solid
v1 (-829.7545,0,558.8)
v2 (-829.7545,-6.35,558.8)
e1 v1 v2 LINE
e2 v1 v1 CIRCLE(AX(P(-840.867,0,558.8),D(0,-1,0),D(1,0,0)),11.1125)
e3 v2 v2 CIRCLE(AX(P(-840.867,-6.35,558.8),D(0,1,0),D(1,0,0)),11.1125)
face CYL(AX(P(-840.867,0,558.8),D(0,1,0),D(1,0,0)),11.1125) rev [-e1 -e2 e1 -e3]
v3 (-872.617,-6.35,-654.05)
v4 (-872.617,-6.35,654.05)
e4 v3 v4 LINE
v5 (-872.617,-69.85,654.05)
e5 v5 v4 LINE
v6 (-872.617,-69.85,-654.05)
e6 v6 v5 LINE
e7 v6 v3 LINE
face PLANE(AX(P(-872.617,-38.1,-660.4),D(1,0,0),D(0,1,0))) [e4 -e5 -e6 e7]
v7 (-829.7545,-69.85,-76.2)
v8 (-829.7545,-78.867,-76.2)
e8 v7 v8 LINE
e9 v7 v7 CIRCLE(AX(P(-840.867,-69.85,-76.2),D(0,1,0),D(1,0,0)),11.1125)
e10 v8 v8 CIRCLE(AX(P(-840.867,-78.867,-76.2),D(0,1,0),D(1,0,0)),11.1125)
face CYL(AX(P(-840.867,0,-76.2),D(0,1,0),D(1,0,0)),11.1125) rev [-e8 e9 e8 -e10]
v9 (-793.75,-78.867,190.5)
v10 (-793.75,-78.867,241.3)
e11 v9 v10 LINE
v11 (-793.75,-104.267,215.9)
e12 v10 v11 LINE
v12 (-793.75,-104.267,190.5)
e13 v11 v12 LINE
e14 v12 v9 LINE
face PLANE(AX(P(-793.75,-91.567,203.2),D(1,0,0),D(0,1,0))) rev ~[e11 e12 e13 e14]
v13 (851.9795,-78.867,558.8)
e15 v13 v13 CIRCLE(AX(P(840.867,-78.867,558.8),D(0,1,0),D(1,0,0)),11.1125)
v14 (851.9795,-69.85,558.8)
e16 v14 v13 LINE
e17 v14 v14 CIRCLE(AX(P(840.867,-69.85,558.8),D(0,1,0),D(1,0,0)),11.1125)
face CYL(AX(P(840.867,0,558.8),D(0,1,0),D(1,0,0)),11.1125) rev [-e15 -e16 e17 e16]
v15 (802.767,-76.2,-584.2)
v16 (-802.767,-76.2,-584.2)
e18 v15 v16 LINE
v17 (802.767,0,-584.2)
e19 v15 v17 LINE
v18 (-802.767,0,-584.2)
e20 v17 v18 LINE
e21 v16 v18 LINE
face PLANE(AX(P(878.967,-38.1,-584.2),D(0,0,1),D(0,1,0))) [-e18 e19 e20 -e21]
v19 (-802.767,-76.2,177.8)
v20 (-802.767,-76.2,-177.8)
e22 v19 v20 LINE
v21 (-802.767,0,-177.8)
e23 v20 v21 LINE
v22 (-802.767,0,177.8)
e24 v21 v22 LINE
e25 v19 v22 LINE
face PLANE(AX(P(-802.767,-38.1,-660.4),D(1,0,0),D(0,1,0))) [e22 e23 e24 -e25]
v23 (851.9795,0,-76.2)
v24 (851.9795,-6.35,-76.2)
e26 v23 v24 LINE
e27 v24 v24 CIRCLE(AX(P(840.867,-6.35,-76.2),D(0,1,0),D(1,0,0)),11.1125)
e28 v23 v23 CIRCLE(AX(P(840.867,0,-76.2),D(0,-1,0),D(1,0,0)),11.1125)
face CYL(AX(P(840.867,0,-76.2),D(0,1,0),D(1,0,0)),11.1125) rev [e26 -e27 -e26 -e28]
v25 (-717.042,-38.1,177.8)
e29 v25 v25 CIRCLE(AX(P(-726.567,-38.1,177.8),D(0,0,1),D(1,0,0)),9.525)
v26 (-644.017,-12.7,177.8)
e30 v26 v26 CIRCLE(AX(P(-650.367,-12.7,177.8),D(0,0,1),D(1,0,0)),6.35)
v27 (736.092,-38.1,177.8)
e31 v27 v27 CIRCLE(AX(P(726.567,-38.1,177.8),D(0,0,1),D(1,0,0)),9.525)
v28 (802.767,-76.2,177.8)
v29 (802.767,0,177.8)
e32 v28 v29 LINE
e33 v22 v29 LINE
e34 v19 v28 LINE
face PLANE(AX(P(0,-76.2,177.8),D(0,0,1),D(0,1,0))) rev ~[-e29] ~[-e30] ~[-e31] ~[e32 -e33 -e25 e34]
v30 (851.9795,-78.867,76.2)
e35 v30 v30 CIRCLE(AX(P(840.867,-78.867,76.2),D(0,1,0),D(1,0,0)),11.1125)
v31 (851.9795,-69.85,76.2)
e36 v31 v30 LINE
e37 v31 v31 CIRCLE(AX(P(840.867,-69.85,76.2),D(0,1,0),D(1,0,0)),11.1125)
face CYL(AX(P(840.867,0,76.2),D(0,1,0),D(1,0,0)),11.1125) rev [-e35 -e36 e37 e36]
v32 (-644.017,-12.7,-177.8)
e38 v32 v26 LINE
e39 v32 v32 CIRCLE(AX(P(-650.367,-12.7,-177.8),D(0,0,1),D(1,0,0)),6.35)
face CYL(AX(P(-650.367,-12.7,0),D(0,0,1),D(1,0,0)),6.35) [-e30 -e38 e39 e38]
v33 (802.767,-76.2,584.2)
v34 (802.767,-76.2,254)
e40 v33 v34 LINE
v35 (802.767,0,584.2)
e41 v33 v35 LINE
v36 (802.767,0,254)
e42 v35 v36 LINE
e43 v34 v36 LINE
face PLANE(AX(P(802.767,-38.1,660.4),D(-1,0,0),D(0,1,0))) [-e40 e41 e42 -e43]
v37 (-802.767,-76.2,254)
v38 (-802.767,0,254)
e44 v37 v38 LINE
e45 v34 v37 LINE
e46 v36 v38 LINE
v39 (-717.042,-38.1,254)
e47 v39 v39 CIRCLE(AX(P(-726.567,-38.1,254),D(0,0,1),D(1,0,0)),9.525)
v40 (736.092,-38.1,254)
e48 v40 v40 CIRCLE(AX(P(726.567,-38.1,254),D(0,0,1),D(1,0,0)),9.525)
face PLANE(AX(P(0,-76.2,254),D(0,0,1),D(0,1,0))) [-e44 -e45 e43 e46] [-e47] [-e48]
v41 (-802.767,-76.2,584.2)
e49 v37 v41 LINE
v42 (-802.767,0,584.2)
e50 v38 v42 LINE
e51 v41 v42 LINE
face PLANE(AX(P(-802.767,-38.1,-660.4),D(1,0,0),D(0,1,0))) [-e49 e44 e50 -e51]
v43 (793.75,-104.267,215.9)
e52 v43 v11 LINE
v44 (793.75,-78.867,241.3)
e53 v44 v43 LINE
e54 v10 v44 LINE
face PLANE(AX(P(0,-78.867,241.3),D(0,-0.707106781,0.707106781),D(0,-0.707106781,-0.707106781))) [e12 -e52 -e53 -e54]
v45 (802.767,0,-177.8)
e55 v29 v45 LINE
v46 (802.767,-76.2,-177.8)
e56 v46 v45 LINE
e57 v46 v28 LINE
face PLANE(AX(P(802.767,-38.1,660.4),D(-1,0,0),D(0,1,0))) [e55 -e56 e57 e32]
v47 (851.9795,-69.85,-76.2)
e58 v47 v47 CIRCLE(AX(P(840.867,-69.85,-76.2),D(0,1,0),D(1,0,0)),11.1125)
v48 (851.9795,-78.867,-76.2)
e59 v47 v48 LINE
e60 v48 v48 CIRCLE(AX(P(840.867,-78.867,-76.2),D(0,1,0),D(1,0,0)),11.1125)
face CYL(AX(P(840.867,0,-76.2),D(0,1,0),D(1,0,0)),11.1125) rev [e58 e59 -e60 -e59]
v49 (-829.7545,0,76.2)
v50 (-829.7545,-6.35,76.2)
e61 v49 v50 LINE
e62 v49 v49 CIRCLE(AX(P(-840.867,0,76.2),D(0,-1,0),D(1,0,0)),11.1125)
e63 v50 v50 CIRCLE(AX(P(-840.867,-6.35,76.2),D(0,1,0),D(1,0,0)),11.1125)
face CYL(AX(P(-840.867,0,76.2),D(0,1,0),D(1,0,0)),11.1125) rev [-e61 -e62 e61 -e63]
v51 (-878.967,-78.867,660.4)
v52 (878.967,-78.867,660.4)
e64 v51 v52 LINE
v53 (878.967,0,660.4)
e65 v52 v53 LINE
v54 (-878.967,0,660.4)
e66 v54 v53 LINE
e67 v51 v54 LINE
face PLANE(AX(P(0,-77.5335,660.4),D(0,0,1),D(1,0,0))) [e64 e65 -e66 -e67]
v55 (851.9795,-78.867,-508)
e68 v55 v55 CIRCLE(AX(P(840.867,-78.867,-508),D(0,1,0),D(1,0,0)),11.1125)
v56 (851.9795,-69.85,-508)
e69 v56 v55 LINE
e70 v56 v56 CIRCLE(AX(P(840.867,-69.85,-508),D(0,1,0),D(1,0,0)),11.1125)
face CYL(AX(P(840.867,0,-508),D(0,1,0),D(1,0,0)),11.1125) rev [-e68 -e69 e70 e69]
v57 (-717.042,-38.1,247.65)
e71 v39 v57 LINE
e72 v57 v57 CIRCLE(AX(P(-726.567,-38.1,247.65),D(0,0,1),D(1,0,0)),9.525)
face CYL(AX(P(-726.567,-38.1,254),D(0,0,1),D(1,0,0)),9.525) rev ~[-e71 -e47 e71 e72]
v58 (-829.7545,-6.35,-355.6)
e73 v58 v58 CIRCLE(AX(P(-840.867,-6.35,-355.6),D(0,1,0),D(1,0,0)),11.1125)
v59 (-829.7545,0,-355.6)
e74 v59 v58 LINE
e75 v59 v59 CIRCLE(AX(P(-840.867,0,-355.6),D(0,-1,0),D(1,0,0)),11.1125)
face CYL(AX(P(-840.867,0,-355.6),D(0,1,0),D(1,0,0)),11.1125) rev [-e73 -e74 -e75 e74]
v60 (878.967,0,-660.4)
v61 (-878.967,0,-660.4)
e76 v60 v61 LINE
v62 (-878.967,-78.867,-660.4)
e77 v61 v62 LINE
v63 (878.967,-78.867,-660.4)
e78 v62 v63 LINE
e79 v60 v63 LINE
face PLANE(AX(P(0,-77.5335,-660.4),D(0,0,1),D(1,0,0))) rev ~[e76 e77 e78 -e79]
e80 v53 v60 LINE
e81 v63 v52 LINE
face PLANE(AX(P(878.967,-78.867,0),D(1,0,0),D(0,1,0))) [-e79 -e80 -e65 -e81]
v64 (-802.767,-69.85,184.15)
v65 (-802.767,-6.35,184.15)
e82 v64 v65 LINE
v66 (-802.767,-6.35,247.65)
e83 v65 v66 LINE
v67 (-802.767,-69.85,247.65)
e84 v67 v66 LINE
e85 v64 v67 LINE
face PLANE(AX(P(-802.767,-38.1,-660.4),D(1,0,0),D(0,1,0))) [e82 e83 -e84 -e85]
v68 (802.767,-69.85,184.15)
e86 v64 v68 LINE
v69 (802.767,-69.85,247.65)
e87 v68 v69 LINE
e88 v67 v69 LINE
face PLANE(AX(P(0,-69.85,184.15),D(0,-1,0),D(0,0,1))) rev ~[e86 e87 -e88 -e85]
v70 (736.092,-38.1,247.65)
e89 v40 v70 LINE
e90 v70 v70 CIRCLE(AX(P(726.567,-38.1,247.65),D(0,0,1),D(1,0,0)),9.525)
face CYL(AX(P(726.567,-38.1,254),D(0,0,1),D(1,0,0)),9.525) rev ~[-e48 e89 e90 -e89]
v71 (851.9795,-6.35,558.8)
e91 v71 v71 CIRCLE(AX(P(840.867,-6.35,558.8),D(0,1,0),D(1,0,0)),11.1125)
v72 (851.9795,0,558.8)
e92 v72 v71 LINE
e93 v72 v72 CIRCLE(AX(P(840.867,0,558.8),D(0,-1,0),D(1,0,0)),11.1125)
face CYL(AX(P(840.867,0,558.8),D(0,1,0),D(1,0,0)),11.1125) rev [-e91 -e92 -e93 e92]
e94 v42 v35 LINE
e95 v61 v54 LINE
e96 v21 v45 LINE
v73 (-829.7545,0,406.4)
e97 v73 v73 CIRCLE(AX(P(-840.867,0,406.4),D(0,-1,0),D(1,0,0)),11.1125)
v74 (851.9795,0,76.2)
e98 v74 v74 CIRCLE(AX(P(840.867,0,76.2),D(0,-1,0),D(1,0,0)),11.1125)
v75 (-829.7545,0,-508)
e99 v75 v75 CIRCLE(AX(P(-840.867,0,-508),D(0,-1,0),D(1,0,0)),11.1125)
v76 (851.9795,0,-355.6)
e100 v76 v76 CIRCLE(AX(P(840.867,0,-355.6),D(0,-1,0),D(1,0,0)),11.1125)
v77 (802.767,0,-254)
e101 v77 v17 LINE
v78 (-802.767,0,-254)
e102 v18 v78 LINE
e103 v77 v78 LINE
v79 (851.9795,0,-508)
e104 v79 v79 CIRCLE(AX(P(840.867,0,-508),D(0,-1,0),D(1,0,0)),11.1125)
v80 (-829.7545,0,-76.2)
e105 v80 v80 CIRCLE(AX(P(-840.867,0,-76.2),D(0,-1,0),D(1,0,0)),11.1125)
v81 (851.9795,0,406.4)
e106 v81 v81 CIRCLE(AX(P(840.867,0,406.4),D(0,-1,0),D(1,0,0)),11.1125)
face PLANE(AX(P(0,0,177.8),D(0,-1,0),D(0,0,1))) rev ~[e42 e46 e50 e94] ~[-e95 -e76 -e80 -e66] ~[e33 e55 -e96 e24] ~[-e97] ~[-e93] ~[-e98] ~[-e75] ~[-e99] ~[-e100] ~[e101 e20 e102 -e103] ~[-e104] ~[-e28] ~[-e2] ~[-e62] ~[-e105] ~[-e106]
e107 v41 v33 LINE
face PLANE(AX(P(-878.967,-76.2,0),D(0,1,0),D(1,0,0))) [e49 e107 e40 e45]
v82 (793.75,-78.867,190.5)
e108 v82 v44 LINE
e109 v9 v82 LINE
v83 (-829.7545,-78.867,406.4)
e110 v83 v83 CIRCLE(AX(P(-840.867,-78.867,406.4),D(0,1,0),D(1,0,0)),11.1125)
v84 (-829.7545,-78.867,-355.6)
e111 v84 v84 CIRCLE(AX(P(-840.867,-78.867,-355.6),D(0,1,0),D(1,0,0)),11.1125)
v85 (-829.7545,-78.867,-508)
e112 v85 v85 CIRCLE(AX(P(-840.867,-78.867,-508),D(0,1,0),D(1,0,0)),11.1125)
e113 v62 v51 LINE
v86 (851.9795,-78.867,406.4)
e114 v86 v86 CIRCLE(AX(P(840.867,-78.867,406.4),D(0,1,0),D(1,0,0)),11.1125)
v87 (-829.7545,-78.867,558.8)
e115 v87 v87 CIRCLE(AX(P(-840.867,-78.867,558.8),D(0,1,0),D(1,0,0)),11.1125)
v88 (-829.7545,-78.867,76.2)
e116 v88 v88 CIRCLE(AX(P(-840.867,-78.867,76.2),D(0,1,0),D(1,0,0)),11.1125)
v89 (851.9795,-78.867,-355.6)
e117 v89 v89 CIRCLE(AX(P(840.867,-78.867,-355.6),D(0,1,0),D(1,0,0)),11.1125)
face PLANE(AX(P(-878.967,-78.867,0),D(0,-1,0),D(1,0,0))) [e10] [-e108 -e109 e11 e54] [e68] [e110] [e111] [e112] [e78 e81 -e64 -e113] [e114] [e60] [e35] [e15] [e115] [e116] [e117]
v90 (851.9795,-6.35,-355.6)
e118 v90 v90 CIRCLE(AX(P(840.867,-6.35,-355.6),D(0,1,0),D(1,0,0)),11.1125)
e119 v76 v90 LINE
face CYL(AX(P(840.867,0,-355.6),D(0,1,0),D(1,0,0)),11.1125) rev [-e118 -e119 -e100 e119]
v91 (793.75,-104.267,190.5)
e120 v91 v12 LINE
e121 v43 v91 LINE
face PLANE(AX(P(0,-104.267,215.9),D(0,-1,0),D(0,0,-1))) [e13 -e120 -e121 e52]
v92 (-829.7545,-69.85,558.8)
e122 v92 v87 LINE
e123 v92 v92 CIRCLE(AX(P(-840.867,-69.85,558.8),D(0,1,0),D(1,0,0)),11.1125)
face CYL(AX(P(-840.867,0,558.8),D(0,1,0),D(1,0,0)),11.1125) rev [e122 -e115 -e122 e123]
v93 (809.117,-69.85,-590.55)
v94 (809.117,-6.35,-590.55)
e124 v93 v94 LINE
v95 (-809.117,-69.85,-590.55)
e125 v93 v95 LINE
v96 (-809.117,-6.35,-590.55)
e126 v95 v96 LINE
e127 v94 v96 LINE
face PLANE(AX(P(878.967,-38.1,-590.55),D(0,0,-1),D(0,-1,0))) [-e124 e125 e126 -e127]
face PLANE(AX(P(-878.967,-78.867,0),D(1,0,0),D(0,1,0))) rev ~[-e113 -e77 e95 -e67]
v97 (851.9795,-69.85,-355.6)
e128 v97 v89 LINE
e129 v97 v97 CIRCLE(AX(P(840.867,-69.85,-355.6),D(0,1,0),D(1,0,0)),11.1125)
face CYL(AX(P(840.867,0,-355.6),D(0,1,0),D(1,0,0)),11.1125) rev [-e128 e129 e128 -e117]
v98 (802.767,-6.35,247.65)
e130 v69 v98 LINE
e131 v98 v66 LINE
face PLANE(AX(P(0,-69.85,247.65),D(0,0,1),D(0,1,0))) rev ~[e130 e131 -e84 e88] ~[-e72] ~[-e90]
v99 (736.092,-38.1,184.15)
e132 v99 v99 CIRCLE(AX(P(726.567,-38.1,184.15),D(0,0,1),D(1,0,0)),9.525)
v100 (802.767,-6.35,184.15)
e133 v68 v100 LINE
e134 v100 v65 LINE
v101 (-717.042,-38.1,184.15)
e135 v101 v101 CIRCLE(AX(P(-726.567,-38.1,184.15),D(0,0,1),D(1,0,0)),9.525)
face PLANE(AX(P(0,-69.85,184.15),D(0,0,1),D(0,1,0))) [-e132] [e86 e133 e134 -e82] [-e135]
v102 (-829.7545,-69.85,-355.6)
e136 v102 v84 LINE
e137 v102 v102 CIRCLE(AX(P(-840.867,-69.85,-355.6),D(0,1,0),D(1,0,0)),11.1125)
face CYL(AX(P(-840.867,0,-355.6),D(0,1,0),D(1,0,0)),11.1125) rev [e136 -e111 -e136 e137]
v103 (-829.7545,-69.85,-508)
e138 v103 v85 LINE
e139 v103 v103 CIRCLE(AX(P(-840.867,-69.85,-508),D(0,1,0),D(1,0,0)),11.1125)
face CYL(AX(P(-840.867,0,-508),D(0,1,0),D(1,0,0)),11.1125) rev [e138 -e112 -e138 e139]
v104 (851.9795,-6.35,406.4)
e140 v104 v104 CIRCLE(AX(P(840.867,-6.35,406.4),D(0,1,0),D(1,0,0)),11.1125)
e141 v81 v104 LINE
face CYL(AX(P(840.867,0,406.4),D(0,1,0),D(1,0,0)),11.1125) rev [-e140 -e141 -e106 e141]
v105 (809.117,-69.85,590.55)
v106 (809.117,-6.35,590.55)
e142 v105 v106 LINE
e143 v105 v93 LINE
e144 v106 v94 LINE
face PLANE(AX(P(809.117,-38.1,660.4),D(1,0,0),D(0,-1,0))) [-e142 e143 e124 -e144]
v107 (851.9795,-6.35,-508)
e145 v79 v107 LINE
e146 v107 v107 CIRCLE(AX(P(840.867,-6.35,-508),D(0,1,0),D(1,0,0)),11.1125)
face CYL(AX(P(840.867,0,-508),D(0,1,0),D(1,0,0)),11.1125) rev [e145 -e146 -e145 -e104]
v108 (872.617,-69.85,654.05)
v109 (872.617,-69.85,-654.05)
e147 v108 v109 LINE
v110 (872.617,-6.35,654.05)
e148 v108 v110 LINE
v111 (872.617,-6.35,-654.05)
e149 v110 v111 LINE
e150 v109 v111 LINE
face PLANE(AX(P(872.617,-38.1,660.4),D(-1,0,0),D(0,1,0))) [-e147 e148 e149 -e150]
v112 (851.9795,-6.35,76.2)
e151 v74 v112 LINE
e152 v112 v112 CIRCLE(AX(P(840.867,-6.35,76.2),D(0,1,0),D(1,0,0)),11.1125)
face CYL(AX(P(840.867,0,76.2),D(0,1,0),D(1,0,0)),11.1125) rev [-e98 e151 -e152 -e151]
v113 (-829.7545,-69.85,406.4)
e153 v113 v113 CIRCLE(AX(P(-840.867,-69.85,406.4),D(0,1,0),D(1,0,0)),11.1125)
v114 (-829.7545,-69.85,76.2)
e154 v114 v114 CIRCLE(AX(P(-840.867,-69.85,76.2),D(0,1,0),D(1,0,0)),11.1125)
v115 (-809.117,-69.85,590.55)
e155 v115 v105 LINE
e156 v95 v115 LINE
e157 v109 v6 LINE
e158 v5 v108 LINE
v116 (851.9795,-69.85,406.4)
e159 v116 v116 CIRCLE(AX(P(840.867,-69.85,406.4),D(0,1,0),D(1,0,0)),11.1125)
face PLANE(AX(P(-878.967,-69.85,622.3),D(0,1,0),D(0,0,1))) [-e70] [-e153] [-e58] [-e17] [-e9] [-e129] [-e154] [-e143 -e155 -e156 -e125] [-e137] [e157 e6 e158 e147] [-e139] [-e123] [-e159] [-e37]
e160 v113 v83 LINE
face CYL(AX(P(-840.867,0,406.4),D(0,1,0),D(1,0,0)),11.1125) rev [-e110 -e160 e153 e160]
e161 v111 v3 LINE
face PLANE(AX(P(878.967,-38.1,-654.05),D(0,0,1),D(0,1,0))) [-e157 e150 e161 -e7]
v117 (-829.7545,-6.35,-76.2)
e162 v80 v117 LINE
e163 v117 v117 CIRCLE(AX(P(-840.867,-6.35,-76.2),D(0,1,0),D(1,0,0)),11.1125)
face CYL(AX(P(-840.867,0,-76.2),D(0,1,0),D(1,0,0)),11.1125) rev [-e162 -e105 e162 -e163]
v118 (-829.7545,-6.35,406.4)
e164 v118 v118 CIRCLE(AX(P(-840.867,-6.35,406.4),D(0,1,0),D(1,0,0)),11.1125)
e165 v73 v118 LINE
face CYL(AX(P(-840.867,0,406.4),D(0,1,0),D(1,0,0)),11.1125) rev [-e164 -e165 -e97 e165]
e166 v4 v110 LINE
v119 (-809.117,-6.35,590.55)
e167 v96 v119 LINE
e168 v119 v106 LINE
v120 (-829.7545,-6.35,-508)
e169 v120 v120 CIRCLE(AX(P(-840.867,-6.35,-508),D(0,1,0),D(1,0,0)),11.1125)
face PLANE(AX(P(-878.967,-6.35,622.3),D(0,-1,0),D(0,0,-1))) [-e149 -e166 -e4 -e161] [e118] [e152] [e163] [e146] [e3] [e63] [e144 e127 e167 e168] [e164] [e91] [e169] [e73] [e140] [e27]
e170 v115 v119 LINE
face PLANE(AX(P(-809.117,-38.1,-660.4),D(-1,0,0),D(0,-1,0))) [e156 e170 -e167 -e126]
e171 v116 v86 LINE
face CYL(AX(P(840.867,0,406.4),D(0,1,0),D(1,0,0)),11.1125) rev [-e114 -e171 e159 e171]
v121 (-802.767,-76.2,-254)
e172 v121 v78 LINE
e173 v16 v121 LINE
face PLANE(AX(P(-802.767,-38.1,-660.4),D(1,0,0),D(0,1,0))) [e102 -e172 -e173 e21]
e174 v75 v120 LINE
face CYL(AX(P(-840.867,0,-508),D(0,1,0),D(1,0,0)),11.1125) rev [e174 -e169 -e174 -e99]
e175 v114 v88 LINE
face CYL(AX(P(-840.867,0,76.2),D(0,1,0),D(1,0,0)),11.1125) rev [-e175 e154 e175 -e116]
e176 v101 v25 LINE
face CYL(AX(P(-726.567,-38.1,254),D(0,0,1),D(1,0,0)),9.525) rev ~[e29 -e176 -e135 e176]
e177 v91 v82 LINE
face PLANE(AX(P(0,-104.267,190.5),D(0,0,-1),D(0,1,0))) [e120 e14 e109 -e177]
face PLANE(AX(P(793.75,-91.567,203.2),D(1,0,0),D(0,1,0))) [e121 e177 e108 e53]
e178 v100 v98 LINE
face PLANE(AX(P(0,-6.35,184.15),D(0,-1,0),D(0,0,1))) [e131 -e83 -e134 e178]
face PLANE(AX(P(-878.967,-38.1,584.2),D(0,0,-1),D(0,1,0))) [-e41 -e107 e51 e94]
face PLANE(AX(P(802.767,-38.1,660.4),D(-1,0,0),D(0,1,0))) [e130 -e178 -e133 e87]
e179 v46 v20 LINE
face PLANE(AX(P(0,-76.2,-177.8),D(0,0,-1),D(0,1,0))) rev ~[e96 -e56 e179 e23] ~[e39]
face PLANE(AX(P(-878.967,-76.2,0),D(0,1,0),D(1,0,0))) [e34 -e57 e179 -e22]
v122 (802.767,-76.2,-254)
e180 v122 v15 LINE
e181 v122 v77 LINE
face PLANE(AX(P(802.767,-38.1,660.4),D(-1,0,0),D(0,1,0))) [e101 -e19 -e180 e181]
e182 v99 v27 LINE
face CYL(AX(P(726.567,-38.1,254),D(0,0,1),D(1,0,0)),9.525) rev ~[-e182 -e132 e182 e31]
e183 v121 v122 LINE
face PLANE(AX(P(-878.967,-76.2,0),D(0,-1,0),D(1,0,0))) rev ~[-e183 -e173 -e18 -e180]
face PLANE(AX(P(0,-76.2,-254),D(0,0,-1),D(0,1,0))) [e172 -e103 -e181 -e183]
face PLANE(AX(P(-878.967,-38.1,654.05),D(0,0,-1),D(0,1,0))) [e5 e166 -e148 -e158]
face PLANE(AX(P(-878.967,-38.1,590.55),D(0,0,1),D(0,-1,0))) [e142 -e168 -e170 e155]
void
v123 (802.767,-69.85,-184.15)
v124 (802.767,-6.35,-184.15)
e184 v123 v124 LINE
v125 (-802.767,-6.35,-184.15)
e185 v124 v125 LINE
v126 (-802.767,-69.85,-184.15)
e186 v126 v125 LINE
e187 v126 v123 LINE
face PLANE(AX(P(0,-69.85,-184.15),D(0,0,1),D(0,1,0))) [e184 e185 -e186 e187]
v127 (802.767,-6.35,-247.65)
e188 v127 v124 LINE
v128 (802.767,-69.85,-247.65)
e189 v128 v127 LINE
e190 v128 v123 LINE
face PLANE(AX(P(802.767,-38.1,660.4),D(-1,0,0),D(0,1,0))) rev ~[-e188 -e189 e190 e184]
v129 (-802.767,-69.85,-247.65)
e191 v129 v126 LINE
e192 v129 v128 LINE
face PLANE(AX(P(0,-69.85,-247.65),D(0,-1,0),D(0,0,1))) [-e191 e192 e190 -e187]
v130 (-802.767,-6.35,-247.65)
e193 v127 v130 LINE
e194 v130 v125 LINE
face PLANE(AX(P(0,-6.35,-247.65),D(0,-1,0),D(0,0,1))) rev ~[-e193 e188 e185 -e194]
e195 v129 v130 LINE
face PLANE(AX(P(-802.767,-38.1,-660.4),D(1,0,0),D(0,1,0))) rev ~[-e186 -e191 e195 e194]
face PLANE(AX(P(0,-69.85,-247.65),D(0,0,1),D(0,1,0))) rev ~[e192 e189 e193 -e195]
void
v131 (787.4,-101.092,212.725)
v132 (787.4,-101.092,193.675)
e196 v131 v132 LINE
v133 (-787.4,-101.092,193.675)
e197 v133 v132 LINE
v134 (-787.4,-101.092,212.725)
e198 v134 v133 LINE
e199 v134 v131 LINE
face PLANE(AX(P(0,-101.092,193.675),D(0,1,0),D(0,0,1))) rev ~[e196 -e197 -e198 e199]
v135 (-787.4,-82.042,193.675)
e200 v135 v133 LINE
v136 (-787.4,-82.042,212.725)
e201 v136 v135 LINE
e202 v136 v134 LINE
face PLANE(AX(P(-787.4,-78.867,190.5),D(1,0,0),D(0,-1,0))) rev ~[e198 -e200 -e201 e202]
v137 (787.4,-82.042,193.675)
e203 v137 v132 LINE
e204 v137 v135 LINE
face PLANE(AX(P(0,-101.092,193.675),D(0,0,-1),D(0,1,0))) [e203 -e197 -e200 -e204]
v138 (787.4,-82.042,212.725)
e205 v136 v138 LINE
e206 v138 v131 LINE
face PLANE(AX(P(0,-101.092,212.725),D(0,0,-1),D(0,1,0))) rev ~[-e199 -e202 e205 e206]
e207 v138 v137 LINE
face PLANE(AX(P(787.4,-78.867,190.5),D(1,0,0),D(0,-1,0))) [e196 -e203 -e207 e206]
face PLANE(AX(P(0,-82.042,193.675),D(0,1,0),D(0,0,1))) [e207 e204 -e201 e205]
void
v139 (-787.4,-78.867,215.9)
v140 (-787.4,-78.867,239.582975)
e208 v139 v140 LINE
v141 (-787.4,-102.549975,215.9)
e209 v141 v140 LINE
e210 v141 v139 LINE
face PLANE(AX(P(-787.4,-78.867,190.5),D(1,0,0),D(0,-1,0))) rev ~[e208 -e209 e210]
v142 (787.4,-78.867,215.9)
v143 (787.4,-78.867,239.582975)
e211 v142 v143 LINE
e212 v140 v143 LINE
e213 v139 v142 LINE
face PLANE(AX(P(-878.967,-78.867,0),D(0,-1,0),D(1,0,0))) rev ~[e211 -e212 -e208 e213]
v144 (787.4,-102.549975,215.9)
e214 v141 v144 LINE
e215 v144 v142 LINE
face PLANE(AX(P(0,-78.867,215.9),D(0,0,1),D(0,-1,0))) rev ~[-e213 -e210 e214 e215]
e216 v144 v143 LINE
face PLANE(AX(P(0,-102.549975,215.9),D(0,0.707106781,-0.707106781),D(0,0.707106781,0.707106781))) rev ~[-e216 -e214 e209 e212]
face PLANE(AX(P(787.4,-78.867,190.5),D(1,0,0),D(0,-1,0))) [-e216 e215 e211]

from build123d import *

# Parameters (mm, degrees)
F1_W           = 76.2
F1_H           = 76.2
F1_W_2         = 63.5
F1_H_2         = 63.5
F3_W           = 76.2
F3_H           = 76.2
F3_W_2         = 63.5
F3_H_2         = 63.5
F4_DEPTH       = 802.767
F4_DEPTH_BACK  = 802.767
F5_W           = 1757.934
F5_H           = 2.667
F6_DEPTH       = 660.4
F6_DEPTH_BACK  = 660.4
F7_W           = 19.05
F7_H           = 19.05
F8_DEPTH       = 793.75
F9_W           = 6.35
F9_H           = 25.4
F10_REACH      = 496.0827207226
F11_R          = 11.1125
F12_DEPTH      = 104.268
F13_R          = 9.525
F14_DEPTH      = 76.2
F15_R          = 6.35
F16_DEPTH      = 177.8
F16_DEPTH_BACK = 177.8


# Not quite as in the source:
# - an extrude ends at something that could not be found from the text; its depth is read off the source's solid


with BuildPart() as f2:
    # F2: sweep along a path in F0
    with BuildLine(Plane.XZ) as f2_path:
        Line((-878.967, 660.4), (878.967, 660.4))
        Line((878.967, 660.4), (878.967, -660.4))
        Line((878.967, -660.4), (-878.967, -660.4))
        Line((-878.967, -660.4), (-878.967, 660.4))
    # F1 (on Top) → F2 (sweep)
    with BuildSketch(Plane.XY):
        with Locations((-840.867, -38.1)):
            Rectangle(F1_W, F1_H)
        with Locations((-840.867, -38.1)):
            Rectangle(F1_W_2, F1_H_2, mode=Mode.SUBTRACT)
    sweep(path=f2_path.line, transition=Transition.RIGHT)

    # F3 (on Right) → F4 (join, two sides)
    with BuildSketch(Plane.YZ) as f4_sk:
        with Locations((-38.1, 215.9)):
            Rectangle(F3_W, F3_H)
        with Locations((-38.1, 215.9)):
            Rectangle(F3_W_2, F3_H_2, mode=Mode.SUBTRACT)
        with Locations((-38.1, -215.9)):
            Rectangle(F3_W, F3_H)
        with Locations((-38.1, -215.9)):
            Rectangle(F3_W_2, F3_H_2, mode=Mode.SUBTRACT)
    extrude(amount=-F4_DEPTH)
    extrude(f4_sk.sketch, amount=F4_DEPTH_BACK)

    # F5 (on Top) → F6 (join, two sides)
    with BuildSketch(Plane.XY) as f6_sk:
        with Locations((0, -77.5335)):
            Rectangle(F5_W, F5_H)
    extrude(amount=F6_DEPTH)
    extrude(f6_sk.sketch, amount=-F6_DEPTH_BACK)

    # F7 (on Right) → F8 (join, symmetric)
    with BuildSketch(Plane.YZ):
        Polygon((-78.867, 190.5), (-78.867, 215.9), (-102.5499750297, 215.9), (-104.267, 215.9), (-104.267, 190.5), align=None)
        with Locations((-91.567, 203.2)):
            Rectangle(F7_W, F7_H, mode=Mode.SUBTRACT)
        Polygon((-104.267, 215.9), (-102.5499750297, 215.9), (-78.867, 239.5829750297), (-78.867, 241.3), align=None)
    extrude(amount=F8_DEPTH, both=True)

    f10_end = Plane(origin=(0, -90.7084875148, 227.7414875149), x_dir=(0, 0.7071067812, 0.7071067812), z_dir=(0, 0.7071067812, -0.7071067812))
    # F9 (on face) → F10 (join, up to a plane its end follows)
    with BuildSketch(Plane(origin=(0, 0, 190.5000000001), x_dir=(1, 0, 0), z_dir=(0, 0, -1))):
        with Locations((790.575, 91.567)):
            Rectangle(F9_W, F9_H)
        with Locations((-790.575, 91.567)):
            Rectangle(F9_W, F9_H)
    f10_long = extrude(amount=-F10_REACH, mode=Mode.PRIVATE)
    add(split(f10_long, bisect_by=f10_end, keep=Keep.TOP, mode=Mode.PRIVATE))

    # F11 (on Front) → F12 (cut, through all)
    with BuildSketch(Plane.XZ):
        with Locations((-840.867, -76.2)):
            Circle(F11_R)
        with Locations((-840.867, -508)):
            Circle(F11_R)
        with Locations((-840.867, 76.2000000001)):
            Circle(F11_R)
        with Locations((-840.867, -355.6)):
            Circle(F11_R)
        with Locations((-840.867, 406.4)):
            Circle(F11_R)
        with Locations((-840.867, 558.8)):
            Circle(F11_R)
        with Locations((840.867, 558.8)):
            Circle(F11_R)
        with Locations((840.867, 406.4)):
            Circle(F11_R)
        with Locations((840.867, 76.2000000001)):
            Circle(F11_R)
        with Locations((840.867, -76.2)):
            Circle(F11_R)
        with Locations((840.867, -355.6)):
            Circle(F11_R)
        with Locations((840.867, -508)):
            Circle(F11_R)
    extrude(amount=F12_DEPTH, mode=Mode.SUBTRACT)

    # F13 (on face) → F14 (cut, through all)
    with BuildSketch(Plane.XY.offset(254)):
        with Locations((-726.567, -38.1)):
            Circle(F13_R)
        with Locations((726.567, -38.1)):
            Circle(F13_R)
    extrude(amount=-F14_DEPTH, mode=Mode.SUBTRACT)

    # F15 (on Top) → F16 (join, two sides)
    with BuildSketch(Plane.XY) as f16_sk:
        with Locations((-650.367, -12.7)):
            Circle(F15_R)
    extrude(amount=F16_DEPTH)
    extrude(f16_sk.sketch, amount=-F16_DEPTH_BACK)


solid = f2.part
